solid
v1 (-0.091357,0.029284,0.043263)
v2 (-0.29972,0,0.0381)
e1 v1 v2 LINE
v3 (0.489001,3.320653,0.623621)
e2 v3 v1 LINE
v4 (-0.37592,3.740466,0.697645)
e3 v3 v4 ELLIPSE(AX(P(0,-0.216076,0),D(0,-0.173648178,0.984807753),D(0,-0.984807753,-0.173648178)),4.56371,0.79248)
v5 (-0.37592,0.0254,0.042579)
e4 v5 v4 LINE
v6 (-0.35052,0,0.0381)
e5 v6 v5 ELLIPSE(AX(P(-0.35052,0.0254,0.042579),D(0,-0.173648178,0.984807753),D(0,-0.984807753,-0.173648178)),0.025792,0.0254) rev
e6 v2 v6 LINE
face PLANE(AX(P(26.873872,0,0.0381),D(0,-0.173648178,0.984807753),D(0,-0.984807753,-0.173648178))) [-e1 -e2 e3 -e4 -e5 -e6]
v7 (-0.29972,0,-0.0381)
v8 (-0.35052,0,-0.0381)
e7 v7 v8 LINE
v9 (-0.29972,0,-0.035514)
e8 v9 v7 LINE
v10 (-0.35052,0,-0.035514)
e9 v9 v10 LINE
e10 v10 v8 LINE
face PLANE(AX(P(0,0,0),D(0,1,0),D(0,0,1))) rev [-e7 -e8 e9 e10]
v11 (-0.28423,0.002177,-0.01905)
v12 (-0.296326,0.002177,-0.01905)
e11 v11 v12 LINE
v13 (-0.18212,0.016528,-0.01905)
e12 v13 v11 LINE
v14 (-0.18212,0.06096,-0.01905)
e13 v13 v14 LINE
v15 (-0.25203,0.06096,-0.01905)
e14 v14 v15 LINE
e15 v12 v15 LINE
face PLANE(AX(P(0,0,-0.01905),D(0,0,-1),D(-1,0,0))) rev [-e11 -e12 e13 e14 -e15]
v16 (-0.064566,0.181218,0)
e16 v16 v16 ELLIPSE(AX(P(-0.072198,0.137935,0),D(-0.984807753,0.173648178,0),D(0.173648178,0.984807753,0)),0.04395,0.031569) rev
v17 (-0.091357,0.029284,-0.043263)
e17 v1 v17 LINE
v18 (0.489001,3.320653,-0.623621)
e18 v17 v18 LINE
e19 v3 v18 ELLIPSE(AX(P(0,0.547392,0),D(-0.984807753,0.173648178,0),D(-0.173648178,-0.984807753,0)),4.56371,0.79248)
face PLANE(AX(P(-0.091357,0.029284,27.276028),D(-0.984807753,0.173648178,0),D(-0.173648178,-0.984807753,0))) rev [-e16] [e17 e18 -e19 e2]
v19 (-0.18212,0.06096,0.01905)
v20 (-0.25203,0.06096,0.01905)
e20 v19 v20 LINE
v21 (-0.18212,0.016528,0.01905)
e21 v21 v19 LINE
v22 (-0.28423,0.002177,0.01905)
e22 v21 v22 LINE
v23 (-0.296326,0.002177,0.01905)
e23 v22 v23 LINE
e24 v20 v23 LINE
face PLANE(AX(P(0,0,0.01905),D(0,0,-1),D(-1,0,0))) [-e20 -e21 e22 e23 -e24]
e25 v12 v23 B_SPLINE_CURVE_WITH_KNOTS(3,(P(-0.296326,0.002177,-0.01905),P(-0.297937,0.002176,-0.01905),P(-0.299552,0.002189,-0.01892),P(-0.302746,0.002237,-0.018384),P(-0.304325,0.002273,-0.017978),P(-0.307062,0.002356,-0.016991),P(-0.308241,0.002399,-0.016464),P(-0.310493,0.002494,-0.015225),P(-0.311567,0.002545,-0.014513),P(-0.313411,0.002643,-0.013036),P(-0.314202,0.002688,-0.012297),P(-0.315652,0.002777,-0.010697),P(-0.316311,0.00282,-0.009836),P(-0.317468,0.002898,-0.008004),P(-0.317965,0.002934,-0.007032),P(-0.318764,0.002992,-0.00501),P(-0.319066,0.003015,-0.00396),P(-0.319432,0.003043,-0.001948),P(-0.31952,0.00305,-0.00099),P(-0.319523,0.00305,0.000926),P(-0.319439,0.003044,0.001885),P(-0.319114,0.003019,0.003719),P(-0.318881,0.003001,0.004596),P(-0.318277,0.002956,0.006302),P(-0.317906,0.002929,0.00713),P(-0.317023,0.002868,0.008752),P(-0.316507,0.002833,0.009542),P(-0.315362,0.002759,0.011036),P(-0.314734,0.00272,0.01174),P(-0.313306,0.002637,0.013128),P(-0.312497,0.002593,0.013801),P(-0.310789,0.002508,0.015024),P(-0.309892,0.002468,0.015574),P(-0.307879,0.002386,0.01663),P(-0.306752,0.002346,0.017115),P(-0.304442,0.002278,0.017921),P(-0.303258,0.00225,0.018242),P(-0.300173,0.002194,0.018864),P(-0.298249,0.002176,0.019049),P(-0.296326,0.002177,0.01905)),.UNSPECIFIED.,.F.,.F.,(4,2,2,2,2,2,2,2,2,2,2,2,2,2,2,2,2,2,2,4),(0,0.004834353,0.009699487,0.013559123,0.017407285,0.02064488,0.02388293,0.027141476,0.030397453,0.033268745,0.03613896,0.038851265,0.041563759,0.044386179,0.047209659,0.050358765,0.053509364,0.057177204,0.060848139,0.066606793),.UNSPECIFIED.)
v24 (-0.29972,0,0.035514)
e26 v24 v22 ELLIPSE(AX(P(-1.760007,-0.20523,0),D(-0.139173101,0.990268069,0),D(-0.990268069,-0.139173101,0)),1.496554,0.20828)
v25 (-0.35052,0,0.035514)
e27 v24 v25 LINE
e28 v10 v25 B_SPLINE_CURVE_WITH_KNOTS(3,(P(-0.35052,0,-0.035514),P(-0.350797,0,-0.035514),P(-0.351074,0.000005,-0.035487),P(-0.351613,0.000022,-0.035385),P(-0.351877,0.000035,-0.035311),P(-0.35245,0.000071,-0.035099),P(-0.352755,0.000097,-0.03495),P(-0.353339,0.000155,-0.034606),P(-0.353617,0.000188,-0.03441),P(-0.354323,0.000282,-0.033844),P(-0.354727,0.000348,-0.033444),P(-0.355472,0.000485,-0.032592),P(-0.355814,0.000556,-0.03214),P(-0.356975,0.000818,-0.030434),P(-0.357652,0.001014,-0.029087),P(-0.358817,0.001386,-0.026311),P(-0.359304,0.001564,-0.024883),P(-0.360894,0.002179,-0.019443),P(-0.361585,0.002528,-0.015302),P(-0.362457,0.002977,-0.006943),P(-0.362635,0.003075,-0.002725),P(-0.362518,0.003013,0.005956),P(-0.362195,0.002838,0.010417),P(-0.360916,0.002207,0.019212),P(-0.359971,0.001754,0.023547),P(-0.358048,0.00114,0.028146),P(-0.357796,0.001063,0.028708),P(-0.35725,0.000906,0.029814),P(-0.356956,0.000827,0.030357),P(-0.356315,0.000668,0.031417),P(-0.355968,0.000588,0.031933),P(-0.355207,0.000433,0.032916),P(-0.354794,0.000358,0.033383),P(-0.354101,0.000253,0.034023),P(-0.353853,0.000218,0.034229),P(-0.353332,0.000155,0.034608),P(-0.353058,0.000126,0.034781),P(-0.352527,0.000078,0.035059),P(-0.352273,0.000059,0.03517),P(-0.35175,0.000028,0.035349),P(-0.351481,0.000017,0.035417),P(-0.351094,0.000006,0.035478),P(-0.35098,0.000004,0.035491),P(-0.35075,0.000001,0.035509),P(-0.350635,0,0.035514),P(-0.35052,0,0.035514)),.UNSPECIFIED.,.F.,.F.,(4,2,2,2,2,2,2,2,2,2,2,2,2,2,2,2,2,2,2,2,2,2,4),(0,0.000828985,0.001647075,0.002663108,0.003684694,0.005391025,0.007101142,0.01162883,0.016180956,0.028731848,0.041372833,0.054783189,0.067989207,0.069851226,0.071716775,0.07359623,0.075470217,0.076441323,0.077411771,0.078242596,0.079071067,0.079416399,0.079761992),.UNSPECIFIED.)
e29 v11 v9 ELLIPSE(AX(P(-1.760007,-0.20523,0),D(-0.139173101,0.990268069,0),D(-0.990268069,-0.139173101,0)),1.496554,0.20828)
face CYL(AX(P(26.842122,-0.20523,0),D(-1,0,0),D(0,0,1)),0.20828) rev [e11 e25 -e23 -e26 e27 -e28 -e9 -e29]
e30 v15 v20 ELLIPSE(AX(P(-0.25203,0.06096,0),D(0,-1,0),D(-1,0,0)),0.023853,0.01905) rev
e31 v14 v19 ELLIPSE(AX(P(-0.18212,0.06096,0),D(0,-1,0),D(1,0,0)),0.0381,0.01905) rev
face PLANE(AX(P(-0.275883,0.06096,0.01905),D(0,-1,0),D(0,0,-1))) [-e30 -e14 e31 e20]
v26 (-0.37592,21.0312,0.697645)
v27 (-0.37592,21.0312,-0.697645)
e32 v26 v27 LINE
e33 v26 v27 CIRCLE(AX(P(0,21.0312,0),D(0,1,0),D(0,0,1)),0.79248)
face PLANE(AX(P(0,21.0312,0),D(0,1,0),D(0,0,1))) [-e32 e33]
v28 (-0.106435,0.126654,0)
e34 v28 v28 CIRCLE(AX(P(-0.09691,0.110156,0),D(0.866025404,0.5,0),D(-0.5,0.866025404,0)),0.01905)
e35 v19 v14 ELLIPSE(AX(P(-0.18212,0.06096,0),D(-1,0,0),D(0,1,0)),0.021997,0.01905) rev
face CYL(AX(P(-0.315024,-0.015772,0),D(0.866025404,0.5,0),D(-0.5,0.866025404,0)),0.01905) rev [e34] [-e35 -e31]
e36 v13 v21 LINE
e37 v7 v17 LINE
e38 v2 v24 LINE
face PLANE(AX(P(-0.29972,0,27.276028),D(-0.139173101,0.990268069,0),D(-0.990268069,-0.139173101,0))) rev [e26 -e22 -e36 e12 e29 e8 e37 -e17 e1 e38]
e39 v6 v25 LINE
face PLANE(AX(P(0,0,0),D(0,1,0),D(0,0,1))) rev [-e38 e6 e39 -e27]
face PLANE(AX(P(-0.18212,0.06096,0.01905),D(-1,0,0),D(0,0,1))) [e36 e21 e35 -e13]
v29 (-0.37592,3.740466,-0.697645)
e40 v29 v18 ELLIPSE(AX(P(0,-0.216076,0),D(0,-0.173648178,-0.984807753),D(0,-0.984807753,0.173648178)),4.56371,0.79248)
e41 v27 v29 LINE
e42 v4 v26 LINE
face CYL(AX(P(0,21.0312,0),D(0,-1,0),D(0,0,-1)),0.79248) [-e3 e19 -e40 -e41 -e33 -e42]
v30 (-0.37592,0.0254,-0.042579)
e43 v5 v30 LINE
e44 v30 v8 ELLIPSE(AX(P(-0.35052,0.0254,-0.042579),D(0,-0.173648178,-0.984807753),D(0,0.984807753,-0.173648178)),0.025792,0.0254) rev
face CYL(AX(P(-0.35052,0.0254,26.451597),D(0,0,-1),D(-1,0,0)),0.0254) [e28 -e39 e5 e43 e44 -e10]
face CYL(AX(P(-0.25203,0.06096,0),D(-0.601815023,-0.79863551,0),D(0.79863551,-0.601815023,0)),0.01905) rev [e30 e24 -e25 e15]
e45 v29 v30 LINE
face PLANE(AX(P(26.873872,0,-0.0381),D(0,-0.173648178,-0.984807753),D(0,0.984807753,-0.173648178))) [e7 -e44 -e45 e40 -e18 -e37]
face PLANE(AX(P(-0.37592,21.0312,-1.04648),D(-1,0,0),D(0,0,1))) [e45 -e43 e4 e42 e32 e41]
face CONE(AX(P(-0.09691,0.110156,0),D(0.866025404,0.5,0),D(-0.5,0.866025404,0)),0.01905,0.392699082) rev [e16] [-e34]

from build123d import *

# Parameters (mm, degrees)
TD_SKETCH_R                             = 0.79248
TL_FEATURE_DEPTH                        = 21.0312
TDF_STD_SKETCH_W                        = 2.09296
TDF_STD_SKETCH_H                        = 2.09296
TDF_STD_FEATURE_DEPTH                   = 22.061040395
ISA_20_STD_FEATURE_DEPTH                = 22.061040395
ISA_20_STD_FEATURE_DEPTH_BACK           = 22.061040395
F_10BA_STD_FEATURE_DEPTH                = 22.061040395
F_10BA_STD_FEATURE_DEPTH_BACK           = 22.061040395
FRO_STD_FEATURE_DEPTH                   = 22.061040395
FRO_STD_FEATURE_DEPTH_BACK              = 22.061040395
C_STD_FEATURE_DEPTH                     = 22.061040395
C_STD_FEATURE_DEPTH_BACK                = 22.061040395
ERW_STD_FEATURE_DEPTH                   = 0.01905
H_STD_FEATURE_REACH                     = 22.955
H_STD_SKETCH_R                          = 0.01905
H_STD_SKETCH_3_R                        = 0.01905
FUNNEL_FINAL_DIAMETRE_STD_FEATURE_DEPTH = 2.499995
FUNNEL_FINAL_DIAMETRE_STD_FEATURE_DRAFT = -22.5
ROUND_BR_STD_FEATURE_START              = -1
ROUND_BR_STD_FEATURE_DEPTH              = 0.939082249


with BuildPart() as part:
    # TD_sketch → TL_feature (new body)
    with BuildSketch(Plane(origin=(0, 0, 0), x_dir=(1, 0, 0), z_dir=(0, 1, 0))):
        with Locations(Location((0, 0, 0), (0, 0, 270))):
            Circle(TD_SKETCH_R)
    extrude(amount=TL_FEATURE_DEPTH)

    # TDF_STD_sketch → TDF_STD_feature (cut, through all)
    with BuildSketch(Plane(origin=(0, 0, 0), x_dir=(1, 0, 0), z_dir=(0, 1, 0))):
        with Locations((-1.4224, 0)):
            Rectangle(TDF_STD_SKETCH_W, TDF_STD_SKETCH_H)
    extrude(amount=TDF_STD_FEATURE_DEPTH, mode=Mode.SUBTRACT)

    # ISA_20_STD_sketch → ISA_20_STD_feature (cut, two sides: drawn at the far end of the back side and taken through both)
    with BuildSketch(Plane(origin=(0, 0, 0), x_dir=(0, 0, -1), z_dir=(1, 0, 0)).offset(-ISA_20_STD_FEATURE_DEPTH_BACK)):
        Polygon((-12.955177728, 73.256388083), (-3.746467997, 21.0312), (-0.0381, 0), (0.0381, 0), (3.746467997, 21.0312), (12.955177728, 73.256388083), (12.955177728, -32.805303497), (-12.955177728, -32.805303497), align=None)
    extrude(amount=ISA_20_STD_FEATURE_DEPTH + ISA_20_STD_FEATURE_DEPTH_BACK, mode=Mode.SUBTRACT)

    # 10BA_STD_sketch → 10BA_STD_feature (cut, two sides: drawn at the far end of the back side and taken through both)
    with BuildSketch(Plane.XY.offset(-F_10BA_STD_FEATURE_DEPTH_BACK)):
        Polygon((-53.187771959, 0), (-0.37592, 0), (-0.29972, 0), (-0.091356515, 0.029283578), (3.611847997, 21.0312), (12.782529849, 73.04072126), (91.167207296, 2.243763904), (25.196905488, -70.796957355), align=None)
    extrude(amount=F_10BA_STD_FEATURE_DEPTH + F_10BA_STD_FEATURE_DEPTH_BACK, mode=Mode.SUBTRACT)

    # FRO_STD_sketch → FRO_STD_feature (cut, two sides: drawn at the far end of the back side and taken through both)
    with BuildSketch(Plane.XY.offset(-FRO_STD_FEATURE_DEPTH_BACK)):
        with BuildLine():
            Line((-0.37592, 52.149873762), (-0.37592, 0.0254))
            ThreePointArc((-0.37592, 0.0254), (-0.368480512, 0.007439488), (-0.35052, 0))
            Line((-0.35052, 0), (51.773953762, 0))
            Line((51.773953762, 0), (-21.941183964, -73.715137726))
            Line((-21.941183964, -73.715137726), (-74.091057726, -21.565263964))
            Line((-74.091057726, -21.565263964), (-0.37592, 52.149873762))
        make_face()
    extrude(amount=FRO_STD_FEATURE_DEPTH + FRO_STD_FEATURE_DEPTH_BACK, mode=Mode.SUBTRACT)

    # C_STD_sketch → C_STD_feature (cut, two sides: drawn at the far end of the back side and taken through both)
    with BuildSketch(Plane(origin=(0, 0, 0), x_dir=(0, 0, -1), z_dir=(1, 0, 0)).offset(-C_STD_FEATURE_DEPTH_BACK)):
        with BuildLine():
            Line((-51.36762506, -8.882670253), (-0.03551364, 0))
            ThreePointArc((-0.03551364, 0), (0, 0.003050032), (0.03551364, 0))
            Line((0.03551364, 0), (51.36762506, -8.882670253))
            Line((51.36762506, -8.882670253), (51.36762506, -113.072640858))
            Line((51.36762506, -113.072640858), (-51.36762506, -113.072640858))
            Line((-51.36762506, -113.072640858), (-51.36762506, -8.882670253))
        make_face()
    extrude(amount=C_STD_FEATURE_DEPTH + C_STD_FEATURE_DEPTH_BACK, mode=Mode.SUBTRACT)


with BuildPart() as body_2:
    # ERW_STD_sketch → ERW_STD_feature (new, symmetric)
    with BuildSketch(Plane.XY):
        Polygon((-0.182120032, 0.06096), (-0.182120032, 0), (-0.321820032, 0), (-0.275883377, 0.06096), align=None)
    extrude(amount=ERW_STD_FEATURE_DEPTH, both=True)

    # H_STD_sketch → H_STD_feature (add, up to next)
    with BuildSketch(Plane(origin=(-0.096909952, 0.110156063, 0), x_dir=(0, 0, -1), z_dir=(0.8660254037844415, 0.4999999999999953, 0)), mode=Mode.PRIVATE) as h_std_feature_sk1:
        with Locations(Location((0, 0, 0), (0, 0, 90))):
            Circle(H_STD_SKETCH_R)
    h_std_feature_tool1 = extrude(h_std_feature_sk1.sketch, amount=-H_STD_FEATURE_REACH, mode=Mode.PRIVATE) - body_2.part
    add(h_std_feature_tool1.solids().sort_by_distance((-0.09691, 0.110156, 0))[0])


with BuildPart() as funnel_final_diametre_std_feature_tool:
    # H_STD_sketch<3> → funnel_final_diametre_STD_feature (with draft: the straight prism first)
    with BuildSketch(Plane(origin=(-0.096909952, 0.110156063, 0), x_dir=(0, 0, -1), z_dir=(0.8660254037844415, 0.4999999999999953, 0))):
        with Locations(Location((0, 0, 0), (0, 0, 90))):
            Circle(H_STD_SKETCH_3_R)
    extrude(amount=FUNNEL_FINAL_DIAMETRE_STD_FEATURE_DEPTH)
    # funnel_final_diametre_STD_feature: the draft: its side faces are tilted about the plane it starts from
    funnel_final_diametre_std_feature_sides = [funnel_final_diametre_std_feature_tool.faces().sort_by_distance(p)[0] for p in [
        (0.995144638, 0.718657029, 0),
    ]]
    draft(funnel_final_diametre_std_feature_sides, Plane(origin=(-0.096909952, 0.110156063, 0), x_dir=(0, 0, -1), z_dir=(0.8660254037844415, 0.4999999999999953, 0)), FUNNEL_FINAL_DIAMETRE_STD_FEATURE_DRAFT)


with BuildPart() as body_2_1:
    add(body_2.part)

    # funnel_final_diametre_STD_feature: add funnel_final_diametre_std_feature_tool
    add(funnel_final_diametre_std_feature_tool.part)

    # ROUND_BR_STD_feature: read off the stored shape, not the designer's step
    # ROUND_BR_STD_feature outline → ROUND_BR_STD_feature (cut)
    with BuildSketch(Plane(origin=(0, 0, 0), x_dir=(0.79863551004729, -0.601815023152052, 0), z_dir=(0.601815023152052, 0.79863551004729, 0)).offset(ROUND_BR_STD_FEATURE_START)):
        with BuildLine():
            Line((-0.257016905, -0.01905), (-0.237966905, -0.01905))
            ThreePointArc((-0.237966905, -0.01905), (-0.251437289, -0.013470384), (-0.257016905, 0))
            Line((-0.257016905, 0), (-0.257016905, -0.01905))
        make_face()
        with BuildLine():
            Line((-0.257016905, 0.01905), (-0.257016905, 0))
            ThreePointArc((-0.257016905, 0), (-0.251437289, 0.013470384), (-0.237966905, 0.01905))
            Line((-0.237966905, 0.01905), (-0.257016905, 0.01905))
        make_face()
    extrude(amount=ROUND_BR_STD_FEATURE_DEPTH, mode=Mode.SUBTRACT)


with BuildPart() as part_1:
    add(part.part)

    # COMBINE_STD_feature: cut body 2
    add(body_2_1.part, mode=Mode.SUBTRACT)


solid = part_1.part
